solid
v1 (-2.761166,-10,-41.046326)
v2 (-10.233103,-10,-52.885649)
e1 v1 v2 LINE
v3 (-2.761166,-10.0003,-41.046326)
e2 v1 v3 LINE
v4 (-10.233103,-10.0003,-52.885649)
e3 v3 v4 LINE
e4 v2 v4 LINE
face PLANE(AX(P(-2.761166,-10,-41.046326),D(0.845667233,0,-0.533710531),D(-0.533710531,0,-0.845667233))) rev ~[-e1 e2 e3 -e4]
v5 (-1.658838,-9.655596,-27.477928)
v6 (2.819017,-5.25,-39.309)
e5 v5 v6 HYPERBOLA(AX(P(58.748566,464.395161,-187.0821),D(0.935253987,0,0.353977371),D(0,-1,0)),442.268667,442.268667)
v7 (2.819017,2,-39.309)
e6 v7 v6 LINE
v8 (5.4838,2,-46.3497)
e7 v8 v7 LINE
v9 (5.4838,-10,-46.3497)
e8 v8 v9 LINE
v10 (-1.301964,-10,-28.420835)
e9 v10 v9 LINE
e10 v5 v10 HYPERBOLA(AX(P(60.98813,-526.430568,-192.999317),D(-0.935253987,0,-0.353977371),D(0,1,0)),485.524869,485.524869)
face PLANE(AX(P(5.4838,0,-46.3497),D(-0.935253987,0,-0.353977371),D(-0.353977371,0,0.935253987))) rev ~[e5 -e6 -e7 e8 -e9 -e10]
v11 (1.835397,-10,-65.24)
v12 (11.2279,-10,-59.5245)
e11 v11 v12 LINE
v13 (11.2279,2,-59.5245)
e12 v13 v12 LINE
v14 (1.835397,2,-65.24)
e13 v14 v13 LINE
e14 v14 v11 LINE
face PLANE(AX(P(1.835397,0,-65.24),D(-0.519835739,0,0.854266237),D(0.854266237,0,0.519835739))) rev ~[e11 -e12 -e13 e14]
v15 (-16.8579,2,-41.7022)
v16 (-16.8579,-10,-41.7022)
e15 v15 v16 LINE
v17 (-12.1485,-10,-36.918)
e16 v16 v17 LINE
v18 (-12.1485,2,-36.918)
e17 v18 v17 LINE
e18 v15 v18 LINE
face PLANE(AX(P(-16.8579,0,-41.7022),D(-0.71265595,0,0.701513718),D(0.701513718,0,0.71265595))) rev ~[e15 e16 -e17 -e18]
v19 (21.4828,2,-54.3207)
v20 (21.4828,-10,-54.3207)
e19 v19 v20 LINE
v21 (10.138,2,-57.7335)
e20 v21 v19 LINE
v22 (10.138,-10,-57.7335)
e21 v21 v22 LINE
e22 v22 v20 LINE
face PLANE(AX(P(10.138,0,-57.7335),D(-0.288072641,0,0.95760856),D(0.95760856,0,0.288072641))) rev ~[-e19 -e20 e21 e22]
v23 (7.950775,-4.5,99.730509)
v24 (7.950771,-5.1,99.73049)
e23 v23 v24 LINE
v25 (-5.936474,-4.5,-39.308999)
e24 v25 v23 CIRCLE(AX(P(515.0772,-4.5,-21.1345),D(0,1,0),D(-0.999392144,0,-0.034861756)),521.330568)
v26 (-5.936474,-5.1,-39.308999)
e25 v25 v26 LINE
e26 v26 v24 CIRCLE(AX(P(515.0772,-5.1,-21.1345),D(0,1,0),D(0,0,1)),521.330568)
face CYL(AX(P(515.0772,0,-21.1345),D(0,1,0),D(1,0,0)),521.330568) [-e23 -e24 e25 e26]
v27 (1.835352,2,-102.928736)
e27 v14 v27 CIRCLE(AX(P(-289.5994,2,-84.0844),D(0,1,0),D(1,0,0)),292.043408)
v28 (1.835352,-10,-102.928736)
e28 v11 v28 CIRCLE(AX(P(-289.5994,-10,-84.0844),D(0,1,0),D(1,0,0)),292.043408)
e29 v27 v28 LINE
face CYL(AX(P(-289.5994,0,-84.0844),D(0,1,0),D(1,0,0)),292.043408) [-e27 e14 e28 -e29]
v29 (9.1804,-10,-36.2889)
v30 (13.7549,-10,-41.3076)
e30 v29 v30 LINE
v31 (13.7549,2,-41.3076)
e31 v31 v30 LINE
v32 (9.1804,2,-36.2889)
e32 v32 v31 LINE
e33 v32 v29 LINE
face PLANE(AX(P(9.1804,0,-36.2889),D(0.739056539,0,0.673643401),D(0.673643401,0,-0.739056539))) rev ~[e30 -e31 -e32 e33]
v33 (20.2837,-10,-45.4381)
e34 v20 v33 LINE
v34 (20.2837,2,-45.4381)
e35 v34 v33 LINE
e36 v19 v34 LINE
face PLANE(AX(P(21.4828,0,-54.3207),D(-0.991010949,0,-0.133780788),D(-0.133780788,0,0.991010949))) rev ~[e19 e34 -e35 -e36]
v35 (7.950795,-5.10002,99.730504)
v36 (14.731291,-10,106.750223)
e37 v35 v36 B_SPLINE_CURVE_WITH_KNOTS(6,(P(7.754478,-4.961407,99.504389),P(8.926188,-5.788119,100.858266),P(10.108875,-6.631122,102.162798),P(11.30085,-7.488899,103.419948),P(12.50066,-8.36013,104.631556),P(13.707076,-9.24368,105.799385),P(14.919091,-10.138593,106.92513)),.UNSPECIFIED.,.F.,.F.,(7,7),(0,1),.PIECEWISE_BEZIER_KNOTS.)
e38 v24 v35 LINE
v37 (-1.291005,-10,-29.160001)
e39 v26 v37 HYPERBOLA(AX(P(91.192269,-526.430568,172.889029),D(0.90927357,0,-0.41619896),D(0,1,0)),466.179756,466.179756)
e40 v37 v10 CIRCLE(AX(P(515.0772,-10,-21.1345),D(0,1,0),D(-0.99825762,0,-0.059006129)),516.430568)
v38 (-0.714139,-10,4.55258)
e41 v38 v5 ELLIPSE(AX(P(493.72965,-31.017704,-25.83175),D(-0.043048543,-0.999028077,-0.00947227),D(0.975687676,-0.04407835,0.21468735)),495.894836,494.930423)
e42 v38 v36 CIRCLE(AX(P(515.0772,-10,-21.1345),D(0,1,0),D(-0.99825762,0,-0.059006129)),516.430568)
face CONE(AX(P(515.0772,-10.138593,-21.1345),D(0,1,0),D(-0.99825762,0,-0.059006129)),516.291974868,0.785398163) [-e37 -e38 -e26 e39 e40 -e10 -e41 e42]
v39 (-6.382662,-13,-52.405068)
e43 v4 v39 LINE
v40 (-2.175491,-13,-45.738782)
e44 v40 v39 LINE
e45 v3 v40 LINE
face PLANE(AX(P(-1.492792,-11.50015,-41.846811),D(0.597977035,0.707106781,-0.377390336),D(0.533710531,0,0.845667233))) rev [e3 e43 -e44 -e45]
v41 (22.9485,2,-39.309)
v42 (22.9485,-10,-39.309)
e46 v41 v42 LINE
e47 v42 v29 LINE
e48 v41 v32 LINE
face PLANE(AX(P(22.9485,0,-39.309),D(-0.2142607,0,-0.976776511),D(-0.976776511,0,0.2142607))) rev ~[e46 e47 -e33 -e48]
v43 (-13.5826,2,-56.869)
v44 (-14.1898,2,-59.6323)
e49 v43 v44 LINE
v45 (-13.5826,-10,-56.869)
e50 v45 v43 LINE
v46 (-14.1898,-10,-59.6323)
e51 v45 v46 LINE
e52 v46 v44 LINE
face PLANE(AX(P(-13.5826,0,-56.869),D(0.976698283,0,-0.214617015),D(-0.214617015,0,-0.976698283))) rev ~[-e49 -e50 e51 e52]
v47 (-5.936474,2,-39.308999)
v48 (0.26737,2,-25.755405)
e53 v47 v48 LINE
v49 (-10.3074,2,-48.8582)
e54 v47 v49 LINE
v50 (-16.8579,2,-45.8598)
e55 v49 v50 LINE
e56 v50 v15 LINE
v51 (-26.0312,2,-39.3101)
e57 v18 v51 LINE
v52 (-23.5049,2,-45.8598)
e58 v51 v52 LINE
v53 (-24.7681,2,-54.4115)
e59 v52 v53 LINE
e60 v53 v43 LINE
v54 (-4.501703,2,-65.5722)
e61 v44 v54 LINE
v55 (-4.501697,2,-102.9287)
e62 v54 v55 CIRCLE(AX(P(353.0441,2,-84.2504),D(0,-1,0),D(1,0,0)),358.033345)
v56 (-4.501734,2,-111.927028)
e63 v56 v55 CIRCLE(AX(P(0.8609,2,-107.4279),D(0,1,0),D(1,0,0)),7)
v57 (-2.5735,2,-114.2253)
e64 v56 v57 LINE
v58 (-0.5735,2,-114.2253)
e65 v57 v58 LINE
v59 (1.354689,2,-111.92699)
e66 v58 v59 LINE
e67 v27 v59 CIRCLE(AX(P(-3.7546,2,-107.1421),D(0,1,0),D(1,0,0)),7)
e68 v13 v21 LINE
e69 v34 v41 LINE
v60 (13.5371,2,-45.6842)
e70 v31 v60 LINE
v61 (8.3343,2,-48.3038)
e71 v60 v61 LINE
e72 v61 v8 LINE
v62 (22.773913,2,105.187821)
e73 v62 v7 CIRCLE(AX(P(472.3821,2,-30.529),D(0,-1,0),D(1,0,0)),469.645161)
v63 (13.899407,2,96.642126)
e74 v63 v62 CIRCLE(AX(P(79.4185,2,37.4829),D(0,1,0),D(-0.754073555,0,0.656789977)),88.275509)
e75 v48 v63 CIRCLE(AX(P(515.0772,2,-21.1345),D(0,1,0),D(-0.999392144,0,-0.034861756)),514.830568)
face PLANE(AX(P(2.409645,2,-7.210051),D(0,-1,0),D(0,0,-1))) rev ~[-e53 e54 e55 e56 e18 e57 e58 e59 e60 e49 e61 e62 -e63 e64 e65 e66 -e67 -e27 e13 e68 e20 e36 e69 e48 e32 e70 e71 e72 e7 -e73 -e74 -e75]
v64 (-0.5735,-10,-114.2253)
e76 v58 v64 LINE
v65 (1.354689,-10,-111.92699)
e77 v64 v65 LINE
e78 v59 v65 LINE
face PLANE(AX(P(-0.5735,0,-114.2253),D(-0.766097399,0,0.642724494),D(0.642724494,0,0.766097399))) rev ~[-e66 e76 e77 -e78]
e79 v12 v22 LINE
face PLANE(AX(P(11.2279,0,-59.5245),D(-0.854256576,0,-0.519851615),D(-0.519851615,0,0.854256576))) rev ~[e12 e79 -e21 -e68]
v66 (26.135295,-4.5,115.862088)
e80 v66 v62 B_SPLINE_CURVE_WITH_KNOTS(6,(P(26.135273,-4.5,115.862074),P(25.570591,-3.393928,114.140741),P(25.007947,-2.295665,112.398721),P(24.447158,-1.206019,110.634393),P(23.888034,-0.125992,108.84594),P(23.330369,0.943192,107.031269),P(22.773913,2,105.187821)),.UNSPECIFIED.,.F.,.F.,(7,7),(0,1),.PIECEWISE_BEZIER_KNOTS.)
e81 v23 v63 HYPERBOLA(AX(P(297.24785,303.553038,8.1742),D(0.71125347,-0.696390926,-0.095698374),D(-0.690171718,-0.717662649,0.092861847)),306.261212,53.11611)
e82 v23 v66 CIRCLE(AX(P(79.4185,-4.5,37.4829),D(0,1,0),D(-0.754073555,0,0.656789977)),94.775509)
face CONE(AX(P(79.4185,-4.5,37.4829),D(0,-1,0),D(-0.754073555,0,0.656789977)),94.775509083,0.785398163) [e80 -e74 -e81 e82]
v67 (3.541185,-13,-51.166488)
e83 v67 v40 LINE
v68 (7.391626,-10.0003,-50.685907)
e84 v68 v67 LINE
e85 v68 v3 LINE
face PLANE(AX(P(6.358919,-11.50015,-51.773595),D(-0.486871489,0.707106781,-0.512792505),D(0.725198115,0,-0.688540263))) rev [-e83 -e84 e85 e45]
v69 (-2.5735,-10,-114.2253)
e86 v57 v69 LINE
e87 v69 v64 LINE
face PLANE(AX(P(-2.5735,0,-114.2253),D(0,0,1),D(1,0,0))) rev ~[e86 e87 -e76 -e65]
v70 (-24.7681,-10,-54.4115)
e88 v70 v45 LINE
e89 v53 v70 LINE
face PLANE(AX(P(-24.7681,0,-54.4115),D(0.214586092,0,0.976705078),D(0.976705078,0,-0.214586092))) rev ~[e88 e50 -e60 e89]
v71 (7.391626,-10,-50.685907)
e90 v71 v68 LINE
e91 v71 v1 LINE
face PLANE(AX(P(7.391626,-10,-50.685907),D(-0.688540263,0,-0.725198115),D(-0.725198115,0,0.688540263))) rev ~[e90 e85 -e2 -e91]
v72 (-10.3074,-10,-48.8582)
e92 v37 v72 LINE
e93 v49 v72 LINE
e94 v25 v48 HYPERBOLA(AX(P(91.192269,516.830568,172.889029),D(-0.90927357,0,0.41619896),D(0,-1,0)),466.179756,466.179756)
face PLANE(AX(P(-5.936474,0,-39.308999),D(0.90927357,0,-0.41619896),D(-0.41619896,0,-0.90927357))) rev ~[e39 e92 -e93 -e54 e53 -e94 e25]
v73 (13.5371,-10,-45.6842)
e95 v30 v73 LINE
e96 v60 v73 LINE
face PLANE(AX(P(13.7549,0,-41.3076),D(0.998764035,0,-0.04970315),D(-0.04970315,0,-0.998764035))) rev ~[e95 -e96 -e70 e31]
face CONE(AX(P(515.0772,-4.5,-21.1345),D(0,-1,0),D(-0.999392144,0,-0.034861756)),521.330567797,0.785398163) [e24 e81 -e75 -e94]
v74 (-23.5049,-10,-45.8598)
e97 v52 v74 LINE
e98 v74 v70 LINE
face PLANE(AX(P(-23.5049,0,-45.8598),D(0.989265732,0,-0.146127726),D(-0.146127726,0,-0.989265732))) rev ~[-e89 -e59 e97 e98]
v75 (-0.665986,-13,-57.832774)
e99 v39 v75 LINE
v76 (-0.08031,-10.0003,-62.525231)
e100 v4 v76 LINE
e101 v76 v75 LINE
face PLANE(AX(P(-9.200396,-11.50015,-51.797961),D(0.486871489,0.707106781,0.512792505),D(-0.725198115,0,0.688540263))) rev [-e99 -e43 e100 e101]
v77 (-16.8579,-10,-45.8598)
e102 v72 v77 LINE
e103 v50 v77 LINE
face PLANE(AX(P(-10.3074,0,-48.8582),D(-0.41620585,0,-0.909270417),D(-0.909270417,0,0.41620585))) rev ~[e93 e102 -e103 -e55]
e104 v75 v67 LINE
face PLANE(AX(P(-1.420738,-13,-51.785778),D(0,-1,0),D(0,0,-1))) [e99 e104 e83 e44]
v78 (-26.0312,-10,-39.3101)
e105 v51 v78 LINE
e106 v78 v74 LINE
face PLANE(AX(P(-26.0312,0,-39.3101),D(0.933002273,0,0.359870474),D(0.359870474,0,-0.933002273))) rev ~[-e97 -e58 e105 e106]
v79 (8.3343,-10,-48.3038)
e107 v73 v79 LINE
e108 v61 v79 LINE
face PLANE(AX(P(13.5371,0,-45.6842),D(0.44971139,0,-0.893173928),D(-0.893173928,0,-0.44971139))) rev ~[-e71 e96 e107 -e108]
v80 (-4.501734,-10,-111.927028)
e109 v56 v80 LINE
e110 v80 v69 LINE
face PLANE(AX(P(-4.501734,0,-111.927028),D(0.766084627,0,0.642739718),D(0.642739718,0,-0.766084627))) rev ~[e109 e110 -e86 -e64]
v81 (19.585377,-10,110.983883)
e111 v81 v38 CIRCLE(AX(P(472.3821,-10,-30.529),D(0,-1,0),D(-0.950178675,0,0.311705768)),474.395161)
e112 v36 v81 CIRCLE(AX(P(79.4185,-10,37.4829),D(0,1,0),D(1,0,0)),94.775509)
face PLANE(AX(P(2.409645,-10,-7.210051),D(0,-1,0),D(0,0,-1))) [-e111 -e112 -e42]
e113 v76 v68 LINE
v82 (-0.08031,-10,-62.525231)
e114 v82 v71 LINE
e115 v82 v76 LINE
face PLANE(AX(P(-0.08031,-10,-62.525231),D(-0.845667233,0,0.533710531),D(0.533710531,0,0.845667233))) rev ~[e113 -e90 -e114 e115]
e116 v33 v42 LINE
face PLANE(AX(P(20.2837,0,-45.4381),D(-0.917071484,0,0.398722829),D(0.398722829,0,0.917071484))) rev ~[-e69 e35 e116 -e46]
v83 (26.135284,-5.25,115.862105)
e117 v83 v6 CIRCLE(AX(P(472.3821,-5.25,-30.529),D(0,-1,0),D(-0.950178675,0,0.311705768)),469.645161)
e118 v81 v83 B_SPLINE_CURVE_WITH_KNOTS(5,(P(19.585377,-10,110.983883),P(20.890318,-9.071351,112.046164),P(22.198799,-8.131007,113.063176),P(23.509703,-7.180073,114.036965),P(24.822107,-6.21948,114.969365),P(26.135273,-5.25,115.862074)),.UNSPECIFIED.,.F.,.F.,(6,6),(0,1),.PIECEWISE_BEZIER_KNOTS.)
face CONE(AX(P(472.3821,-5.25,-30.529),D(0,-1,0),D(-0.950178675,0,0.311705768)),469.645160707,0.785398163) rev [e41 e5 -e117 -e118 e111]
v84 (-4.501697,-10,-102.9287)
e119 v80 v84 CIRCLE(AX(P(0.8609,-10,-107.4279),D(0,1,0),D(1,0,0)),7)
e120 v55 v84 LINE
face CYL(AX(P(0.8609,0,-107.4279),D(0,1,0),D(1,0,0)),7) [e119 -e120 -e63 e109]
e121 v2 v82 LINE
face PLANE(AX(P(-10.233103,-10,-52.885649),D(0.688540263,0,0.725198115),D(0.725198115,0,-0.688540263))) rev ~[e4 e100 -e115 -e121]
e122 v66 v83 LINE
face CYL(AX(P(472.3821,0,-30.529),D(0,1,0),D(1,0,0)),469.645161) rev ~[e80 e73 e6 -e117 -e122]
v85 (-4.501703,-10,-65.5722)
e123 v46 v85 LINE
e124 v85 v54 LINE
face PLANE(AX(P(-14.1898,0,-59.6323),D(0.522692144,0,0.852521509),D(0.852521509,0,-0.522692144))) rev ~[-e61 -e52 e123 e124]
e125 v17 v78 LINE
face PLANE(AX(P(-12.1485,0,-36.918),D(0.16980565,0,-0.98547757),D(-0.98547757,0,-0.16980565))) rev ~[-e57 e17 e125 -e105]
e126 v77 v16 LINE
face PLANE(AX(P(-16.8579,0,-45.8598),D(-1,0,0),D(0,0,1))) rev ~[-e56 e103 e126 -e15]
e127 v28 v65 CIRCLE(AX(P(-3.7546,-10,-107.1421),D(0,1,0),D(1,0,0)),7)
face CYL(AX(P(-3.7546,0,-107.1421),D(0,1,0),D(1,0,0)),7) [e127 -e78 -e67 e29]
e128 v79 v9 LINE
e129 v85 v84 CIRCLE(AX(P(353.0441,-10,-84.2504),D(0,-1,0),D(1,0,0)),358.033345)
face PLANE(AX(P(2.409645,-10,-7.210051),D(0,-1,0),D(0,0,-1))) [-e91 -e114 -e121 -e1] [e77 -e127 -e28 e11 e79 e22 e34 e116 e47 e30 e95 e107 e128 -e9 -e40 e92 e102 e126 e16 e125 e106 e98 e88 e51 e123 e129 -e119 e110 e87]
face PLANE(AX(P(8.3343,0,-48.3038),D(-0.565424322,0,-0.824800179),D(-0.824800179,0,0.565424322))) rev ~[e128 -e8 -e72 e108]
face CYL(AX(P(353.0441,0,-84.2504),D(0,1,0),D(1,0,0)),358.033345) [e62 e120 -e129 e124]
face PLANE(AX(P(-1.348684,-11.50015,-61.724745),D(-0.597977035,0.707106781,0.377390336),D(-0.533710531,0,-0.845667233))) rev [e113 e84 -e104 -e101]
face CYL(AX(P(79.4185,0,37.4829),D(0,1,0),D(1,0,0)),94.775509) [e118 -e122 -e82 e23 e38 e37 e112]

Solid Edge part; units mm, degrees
sketch "Sketch1" plane through (0, 0, 0) normal (0, -1, 0) x (1, 0, 0)
  arc A0 (-4.5017, -65.5722) -> (-4.5017, -102.9287) centre (353.0441, -84.2504) ccw
  arc A1 (-4.5017, -111.927) -> (-4.5017, -102.9287) centre (0.8609, -107.4279) cw
  line L0 (-4.5017, -111.927) -> (-2.5735, -114.2253)
  line L1 (-2.5735, -114.2253) -> (-0.5735, -114.2253)
  line L2 (-0.5735, -114.2253) -> (1.3547, -111.927)
  arc A2 (1.8354, -102.9287) -> (1.3547, -111.927) centre (-3.7546, -107.1421) cw
  arc A3 (1.8354, -65.24) -> (1.8354, -102.9287) centre (-289.5994, -84.0844) cw
  line L3 (1.8354, -65.24) -> (11.2279, -59.5245)
  line L4 (11.2279, -59.5245) -> (10.138, -57.7335)
  line L5 (10.138, -57.7335) -> (21.4828, -54.3207)
  line L6 (21.4828, -54.3207) -> (20.2837, -45.4381)
  line L7 (20.2837, -45.4381) -> (22.9485, -39.309)
  line L8 (22.9485, -39.309) -> (9.1804, -36.2889)
  line L9 (9.1804, -36.2889) -> (13.7549, -41.3076)
  line L10 (13.7549, -41.3076) -> (13.5371, -45.6842)
  line L11 (13.5371, -45.6842) -> (8.3343, -48.3038)
  line L12 (8.3343, -48.3038) -> (5.4838, -46.3497)
  line L13 (5.4838, -46.3497) -> (2.819, -39.309)
  arc A4 (26.1353, 115.8621) -> (2.819, -39.309) centre (472.3821, -30.529) ccw
  arc A5 (7.9508, 99.7305) -> (26.1353, 115.8621) centre (79.4185, 37.4829) cw
  arc A6 (-5.9365, -39.309) -> (7.9508, 99.7305) centre (515.0772, -21.1345) cw
  line L14 (-5.9365, -39.309) -> (-10.3074, -48.8582)
  line L15 (-10.3074, -48.8582) -> (-16.8579, -45.8598)
  line L16 (-16.8579, -45.8598) -> (-16.8579, -41.7022)
  line L17 (-16.8579, -41.7022) -> (-12.1485, -36.918)
  line L18 (-12.1485, -36.918) -> (-26.0312, -39.3101)
  line L19 (-26.0312, -39.3101) -> (-23.5049, -45.8598)
  line L20 (-23.5049, -45.8598) -> (-24.7681, -54.4115)
  line L21 (-24.7681, -54.4115) -> (-13.5826, -56.869)
  line L22 (-13.5826, -56.869) -> (-14.1898, -59.6323)
  line L23 (-14.1898, -59.6323) -> (-4.5017, -65.5722)
extrude "Kihúzás_1" add sketch "Sketch1" along normal blind 10 and the other way blind 2
sketch "Sketch2" plane through (0.0521, -10, 0.8184) normal (0, -1, 0) x (0.8525228, 0, -0.52269)
  line L0 (19.4839, -37.1611) -> (19.3022, -51.1599)
  line L1 (19.3022, -51.1599) -> (32.9962, -54.0711)
  line L2 (32.9962, -54.0711) -> (33.1779, -40.0723)
  line L3 (33.1779, -40.0723) -> (19.4839, -37.1611)
  dimension "D1" = 14
  dimension "D2" = 14
  dimension "D3" = 14
  dimension "D4" = 14
extrude "Kihúzás_2" add sketch "Sketch2" along normal blind 3
chamfer "Letörés_2" distance 3 angle 45 4 edges at (-6.4972, -13, -46.966) (2.3152, -13, -45.8661) (3.6556, -13, -56.6055) (-5.1567, -13, -57.7054)
chamfer "Letörés_4" distance 4.75 angle 45 1 edges at (7.9508, -10, 39.2572)
chamfer "Letörés_6" distance 4.9 angle 45 1 edges at (-3.6723, -10, 30.6781)
chamfer "Letörés_9" distance 6.5 angle 45 2 edges at (-3.6723, 2, 30.6781) (16.5237, 2, 108.3818)
